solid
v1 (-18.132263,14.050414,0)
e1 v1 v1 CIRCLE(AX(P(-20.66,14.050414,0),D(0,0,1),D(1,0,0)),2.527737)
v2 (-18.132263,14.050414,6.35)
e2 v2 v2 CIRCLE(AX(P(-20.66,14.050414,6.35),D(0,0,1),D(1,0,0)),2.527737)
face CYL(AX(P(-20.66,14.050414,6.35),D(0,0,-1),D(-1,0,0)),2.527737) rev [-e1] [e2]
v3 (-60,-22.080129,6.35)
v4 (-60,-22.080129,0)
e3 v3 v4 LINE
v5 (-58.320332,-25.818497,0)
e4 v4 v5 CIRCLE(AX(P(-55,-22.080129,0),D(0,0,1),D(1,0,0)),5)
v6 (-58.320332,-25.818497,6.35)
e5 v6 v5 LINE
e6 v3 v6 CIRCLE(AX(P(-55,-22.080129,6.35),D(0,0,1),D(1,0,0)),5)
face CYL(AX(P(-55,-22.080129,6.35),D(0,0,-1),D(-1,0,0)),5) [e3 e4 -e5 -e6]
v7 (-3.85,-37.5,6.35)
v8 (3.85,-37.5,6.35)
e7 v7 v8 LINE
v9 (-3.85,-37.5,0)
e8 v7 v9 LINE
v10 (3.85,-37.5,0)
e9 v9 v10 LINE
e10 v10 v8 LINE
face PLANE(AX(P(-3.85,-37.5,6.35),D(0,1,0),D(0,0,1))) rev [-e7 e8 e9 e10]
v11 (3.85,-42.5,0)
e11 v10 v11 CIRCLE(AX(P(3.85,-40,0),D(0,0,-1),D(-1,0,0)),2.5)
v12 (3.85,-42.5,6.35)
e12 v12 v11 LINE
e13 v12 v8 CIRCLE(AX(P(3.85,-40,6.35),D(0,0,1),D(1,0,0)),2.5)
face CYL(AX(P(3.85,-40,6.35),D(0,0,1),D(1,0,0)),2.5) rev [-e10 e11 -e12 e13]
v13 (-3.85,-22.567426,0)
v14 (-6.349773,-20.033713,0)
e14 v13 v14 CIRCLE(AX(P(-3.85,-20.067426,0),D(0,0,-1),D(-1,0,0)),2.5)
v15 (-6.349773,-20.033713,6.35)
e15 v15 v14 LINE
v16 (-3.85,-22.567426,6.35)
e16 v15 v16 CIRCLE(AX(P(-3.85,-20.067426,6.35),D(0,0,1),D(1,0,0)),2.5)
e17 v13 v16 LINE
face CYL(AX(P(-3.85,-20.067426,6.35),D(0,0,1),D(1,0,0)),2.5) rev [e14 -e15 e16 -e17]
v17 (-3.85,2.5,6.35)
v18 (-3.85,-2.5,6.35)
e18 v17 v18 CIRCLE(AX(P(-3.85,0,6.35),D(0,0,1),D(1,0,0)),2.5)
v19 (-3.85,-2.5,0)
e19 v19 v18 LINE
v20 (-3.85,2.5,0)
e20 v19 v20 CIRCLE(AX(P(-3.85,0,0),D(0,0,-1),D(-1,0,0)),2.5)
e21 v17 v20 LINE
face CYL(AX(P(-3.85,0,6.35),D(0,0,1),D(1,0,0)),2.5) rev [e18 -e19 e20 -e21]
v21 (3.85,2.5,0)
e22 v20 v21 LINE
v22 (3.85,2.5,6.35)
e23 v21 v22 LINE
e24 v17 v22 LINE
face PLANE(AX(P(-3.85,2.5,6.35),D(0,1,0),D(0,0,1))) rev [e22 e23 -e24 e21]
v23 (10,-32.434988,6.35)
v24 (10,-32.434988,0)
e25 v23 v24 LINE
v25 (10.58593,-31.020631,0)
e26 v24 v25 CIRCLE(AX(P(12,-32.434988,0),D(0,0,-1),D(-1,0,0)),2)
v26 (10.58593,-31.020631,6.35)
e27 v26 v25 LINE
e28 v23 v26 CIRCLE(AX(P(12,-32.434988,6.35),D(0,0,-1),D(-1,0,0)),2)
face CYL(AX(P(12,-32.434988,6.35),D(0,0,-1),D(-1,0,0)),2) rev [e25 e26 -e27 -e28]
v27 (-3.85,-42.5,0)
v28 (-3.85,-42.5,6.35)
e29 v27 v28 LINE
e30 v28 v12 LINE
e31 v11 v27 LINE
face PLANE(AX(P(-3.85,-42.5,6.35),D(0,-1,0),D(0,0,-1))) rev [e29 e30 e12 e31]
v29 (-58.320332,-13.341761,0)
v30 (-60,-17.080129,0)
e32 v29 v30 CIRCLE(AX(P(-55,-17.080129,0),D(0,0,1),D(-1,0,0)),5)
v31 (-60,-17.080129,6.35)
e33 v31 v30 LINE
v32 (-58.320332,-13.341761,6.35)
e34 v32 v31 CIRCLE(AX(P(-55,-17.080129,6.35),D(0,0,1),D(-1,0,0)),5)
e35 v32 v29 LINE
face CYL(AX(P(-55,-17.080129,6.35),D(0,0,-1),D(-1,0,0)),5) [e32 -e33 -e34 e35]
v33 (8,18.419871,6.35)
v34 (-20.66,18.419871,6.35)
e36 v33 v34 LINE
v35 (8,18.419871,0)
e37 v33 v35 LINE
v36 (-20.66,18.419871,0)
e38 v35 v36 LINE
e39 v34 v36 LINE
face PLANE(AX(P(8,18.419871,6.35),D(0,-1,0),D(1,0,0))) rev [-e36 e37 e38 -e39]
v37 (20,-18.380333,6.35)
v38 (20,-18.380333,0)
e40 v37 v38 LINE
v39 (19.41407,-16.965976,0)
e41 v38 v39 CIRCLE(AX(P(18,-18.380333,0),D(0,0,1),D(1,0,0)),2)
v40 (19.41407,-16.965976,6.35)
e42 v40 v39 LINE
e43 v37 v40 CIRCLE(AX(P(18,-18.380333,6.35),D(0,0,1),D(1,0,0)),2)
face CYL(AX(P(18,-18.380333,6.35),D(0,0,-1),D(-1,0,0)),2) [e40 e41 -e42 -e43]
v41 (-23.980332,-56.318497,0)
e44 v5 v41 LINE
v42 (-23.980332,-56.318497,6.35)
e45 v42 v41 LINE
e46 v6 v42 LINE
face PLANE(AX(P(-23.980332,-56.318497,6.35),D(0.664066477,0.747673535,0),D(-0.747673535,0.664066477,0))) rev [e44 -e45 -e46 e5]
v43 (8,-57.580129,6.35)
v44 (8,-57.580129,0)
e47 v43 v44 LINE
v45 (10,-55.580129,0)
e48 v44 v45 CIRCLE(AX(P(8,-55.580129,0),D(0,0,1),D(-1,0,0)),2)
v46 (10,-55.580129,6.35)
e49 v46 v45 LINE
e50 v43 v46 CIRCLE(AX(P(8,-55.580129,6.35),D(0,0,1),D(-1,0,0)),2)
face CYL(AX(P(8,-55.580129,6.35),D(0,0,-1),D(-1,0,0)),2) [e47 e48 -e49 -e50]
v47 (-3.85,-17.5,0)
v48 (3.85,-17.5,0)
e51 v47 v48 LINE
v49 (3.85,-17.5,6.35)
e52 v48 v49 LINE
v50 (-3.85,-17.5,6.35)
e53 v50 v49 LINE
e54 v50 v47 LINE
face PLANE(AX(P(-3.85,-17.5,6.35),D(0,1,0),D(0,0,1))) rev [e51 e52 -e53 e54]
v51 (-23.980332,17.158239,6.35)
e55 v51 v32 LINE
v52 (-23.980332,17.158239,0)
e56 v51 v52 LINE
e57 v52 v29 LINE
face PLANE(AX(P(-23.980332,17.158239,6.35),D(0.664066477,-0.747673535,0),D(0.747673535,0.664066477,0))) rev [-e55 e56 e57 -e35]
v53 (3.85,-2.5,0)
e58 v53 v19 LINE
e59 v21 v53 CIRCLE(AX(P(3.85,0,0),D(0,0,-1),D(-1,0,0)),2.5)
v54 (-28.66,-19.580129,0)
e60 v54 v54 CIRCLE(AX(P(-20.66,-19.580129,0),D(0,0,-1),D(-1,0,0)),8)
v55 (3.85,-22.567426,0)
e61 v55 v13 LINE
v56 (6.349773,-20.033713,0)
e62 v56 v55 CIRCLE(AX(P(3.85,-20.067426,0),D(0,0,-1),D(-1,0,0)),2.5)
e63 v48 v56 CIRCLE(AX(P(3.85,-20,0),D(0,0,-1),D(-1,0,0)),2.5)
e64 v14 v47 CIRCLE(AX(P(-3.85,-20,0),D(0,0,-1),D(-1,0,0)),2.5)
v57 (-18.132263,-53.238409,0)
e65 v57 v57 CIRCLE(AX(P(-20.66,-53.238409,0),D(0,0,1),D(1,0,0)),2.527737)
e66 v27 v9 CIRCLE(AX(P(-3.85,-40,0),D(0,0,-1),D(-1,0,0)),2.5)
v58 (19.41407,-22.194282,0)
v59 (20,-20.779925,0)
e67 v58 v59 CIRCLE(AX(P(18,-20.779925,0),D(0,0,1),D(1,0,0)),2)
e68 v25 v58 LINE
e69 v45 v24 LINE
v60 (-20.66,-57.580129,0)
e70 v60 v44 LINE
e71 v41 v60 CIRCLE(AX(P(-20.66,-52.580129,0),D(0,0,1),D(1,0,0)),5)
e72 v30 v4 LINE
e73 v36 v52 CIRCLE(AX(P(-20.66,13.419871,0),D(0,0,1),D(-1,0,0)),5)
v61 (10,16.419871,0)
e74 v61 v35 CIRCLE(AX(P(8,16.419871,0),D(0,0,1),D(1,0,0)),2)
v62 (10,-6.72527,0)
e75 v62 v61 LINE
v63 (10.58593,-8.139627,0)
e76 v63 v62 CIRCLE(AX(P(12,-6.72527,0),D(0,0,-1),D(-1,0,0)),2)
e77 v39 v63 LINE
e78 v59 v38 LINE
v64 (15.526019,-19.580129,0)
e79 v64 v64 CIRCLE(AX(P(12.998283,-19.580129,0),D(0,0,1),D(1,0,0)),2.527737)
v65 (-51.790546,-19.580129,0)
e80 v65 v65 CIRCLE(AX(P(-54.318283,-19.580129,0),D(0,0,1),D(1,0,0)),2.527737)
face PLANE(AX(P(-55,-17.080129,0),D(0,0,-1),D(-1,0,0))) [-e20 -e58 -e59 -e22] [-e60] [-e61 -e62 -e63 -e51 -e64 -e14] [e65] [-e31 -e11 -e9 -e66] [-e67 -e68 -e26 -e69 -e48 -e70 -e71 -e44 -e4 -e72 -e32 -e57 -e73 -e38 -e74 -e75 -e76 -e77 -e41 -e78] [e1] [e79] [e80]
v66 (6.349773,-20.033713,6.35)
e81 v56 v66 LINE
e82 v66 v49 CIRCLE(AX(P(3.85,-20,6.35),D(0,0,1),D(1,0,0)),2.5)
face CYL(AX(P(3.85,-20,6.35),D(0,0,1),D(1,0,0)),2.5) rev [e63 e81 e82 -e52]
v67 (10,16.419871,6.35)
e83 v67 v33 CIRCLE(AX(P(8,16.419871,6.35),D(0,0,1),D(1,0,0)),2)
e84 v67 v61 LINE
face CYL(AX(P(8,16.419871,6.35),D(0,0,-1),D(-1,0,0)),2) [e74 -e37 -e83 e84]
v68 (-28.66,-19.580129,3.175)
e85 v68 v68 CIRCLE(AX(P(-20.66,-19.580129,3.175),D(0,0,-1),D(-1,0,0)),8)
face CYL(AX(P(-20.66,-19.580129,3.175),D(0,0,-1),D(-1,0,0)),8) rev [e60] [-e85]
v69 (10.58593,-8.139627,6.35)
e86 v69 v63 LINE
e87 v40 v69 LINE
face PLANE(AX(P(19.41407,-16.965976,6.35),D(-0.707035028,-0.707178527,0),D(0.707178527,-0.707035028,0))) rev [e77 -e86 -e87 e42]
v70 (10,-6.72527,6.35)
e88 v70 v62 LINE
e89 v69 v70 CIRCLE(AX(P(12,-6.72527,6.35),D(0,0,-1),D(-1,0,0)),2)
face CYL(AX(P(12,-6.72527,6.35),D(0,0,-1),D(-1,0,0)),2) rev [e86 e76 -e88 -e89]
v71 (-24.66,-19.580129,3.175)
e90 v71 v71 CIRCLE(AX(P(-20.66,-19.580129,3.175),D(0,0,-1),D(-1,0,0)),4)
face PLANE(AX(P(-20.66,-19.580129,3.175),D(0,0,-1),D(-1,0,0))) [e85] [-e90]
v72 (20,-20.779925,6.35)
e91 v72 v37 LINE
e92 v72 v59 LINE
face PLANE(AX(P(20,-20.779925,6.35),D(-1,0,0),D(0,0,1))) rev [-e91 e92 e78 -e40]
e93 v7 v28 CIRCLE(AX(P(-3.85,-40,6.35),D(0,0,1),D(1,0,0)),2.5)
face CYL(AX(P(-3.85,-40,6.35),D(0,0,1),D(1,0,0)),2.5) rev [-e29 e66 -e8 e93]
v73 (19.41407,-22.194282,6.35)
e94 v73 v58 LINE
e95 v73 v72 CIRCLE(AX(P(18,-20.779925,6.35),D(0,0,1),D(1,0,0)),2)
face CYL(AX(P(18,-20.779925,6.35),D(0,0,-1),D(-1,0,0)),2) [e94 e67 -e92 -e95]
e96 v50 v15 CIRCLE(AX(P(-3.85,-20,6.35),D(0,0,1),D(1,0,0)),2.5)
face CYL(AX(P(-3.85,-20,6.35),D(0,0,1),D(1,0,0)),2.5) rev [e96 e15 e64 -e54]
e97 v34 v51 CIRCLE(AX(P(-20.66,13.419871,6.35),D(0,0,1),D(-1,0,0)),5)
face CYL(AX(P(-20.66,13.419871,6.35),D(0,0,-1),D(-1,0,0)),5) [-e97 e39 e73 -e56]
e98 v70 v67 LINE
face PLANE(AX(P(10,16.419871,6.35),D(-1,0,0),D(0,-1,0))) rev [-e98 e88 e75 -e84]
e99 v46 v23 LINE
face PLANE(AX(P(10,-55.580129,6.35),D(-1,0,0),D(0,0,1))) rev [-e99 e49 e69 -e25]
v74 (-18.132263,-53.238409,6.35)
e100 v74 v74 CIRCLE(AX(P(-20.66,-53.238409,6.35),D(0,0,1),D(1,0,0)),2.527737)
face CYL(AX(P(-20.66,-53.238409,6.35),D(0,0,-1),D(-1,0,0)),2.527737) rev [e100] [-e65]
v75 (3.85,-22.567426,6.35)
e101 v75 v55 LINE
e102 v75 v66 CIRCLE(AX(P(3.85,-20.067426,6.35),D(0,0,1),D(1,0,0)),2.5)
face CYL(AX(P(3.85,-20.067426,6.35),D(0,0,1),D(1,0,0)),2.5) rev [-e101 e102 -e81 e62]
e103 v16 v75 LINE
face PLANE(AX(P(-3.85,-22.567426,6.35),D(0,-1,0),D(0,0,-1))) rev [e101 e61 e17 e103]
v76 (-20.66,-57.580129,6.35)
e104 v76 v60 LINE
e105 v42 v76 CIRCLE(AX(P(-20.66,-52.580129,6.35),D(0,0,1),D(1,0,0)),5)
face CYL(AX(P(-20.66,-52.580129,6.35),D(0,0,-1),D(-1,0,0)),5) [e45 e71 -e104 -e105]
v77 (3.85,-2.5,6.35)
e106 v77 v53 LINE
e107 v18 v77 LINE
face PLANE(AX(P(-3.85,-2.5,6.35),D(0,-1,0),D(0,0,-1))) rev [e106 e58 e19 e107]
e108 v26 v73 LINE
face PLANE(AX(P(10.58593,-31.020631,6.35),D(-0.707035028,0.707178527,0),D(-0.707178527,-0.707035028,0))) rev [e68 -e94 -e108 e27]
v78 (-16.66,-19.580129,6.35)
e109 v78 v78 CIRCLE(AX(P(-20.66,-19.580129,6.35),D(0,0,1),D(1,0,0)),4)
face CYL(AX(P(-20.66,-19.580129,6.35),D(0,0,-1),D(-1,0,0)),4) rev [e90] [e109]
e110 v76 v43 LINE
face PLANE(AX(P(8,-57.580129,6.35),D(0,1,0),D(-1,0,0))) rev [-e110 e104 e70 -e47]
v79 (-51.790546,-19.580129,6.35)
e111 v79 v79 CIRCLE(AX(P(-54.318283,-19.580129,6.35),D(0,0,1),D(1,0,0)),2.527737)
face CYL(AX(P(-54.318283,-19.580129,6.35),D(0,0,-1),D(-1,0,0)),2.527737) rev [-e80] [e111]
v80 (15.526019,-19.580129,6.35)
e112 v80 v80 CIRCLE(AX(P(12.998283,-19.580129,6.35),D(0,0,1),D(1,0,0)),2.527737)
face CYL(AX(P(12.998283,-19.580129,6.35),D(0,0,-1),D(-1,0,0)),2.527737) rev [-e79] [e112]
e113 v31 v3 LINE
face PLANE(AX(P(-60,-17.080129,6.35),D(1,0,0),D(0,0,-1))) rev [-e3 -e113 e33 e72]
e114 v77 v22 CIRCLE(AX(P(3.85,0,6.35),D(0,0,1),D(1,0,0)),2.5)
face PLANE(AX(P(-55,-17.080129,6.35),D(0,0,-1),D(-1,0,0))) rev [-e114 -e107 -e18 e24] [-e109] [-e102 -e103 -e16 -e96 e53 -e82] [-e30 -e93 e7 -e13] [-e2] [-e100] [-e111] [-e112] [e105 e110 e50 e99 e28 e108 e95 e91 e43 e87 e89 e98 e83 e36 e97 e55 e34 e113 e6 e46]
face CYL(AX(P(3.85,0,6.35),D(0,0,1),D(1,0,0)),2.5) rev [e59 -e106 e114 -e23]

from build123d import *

# Parameters (mm, degrees)
SKETCH1_R                 = 4
SKETCH1_R_2               = 2.527736539
BOSS_EXTRUDE1_DEPTH       = 6.35
F_5_0MM_DOWEL_SLOT1_DEPTH = 6.35
SKETCH4_R                 = 8
CUT_EXTRUDE1_DEPTH        = 3.175


# Read off the part's stored shape, not the designer's step: Ø5.0mm Dowel Slot1
with BuildPart() as part:
    # Sketch1 → Boss-Extrude1 (new body)
    with BuildSketch(Plane.XY):
        with BuildLine():
            Line((8, -57.58012907), (-20.66, -57.58012907))
            ThreePointArc((-20.66, -57.58012907), (-22.435973202, -57.254090899), (-23.980332383, -56.318496743))
            Line((-23.980332383, -56.318496743), (-58.320332383, -25.818496743))
            ThreePointArc((-58.320332383, -25.818496743), (-59.560792799, -24.12931648), (-60, -22.08012907))
            Line((-60, -22.08012907), (-60, -17.08012907))
            ThreePointArc((-60, -17.08012907), (-59.560792799, -15.03094166), (-58.320332383, -13.341761396))
            Line((-58.320332383, -13.341761396), (-23.980332383, 17.158238604))
            ThreePointArc((-23.980332383, 17.158238604), (-22.435973202, 18.09383276), (-20.66, 18.41987093))
            Line((-20.66, 18.41987093), (8, 18.41987093))
            ThreePointArc((8, 18.41987093), (9.414213562, 17.834084493), (10, 16.41987093))
            Line((10, 16.41987093), (10, -6.725270109))
            ThreePointArc((10, -6.725270109), (10.152279768, -7.490730718), (10.585929943, -8.139627163))
            Line((10.585929943, -8.139627163), (19.414070057, -16.965975896))
            ThreePointArc((19.414070057, -16.965975896), (19.847720232, -17.614872341), (20, -18.38033295))
            Line((20, -18.38033295), (20, -20.77992519))
            ThreePointArc((20, -20.77992519), (19.847720232, -21.545385798), (19.414070057, -22.194282243))
            Line((19.414070057, -22.194282243), (10.585929943, -31.020630977))
            ThreePointArc((10.585929943, -31.020630977), (10.152279768, -31.669527422), (10, -32.43498803))
            Line((10, -32.43498803), (10, -55.58012907))
            ThreePointArc((10, -55.58012907), (9.414213562, -56.994342632), (8, -57.58012907))
        make_face()
        with Locations((-20.66, -19.58012907)):
            Circle(SKETCH1_R, mode=Mode.SUBTRACT)
        with Locations((-54.318282784, -19.58012907)):
            Circle(SKETCH1_R_2, mode=Mode.SUBTRACT)
        with Locations((-20.66, 14.050414337)):
            Circle(SKETCH1_R_2, mode=Mode.SUBTRACT)
        with Locations((12.998282784, -19.58012907)):
            Circle(SKETCH1_R_2, mode=Mode.SUBTRACT)
        with Locations((-20.66, -53.238409212)):
            Circle(SKETCH1_R_2, mode=Mode.SUBTRACT)
    extrude(amount=BOSS_EXTRUDE1_DEPTH)

    # Ø5.0mm Dowel Slot1 outline → Ø5.0mm Dowel Slot1 (cut)
    with BuildSketch(Plane.XY):
        with BuildLine():
            ThreePointArc((3.85, -22.567426083), (5.629646398, -21.823233219), (6.349772676, -20.033713042))
            ThreePointArc((6.349772676, -20.033713042), (5.629646398, -18.244192864), (3.85, -17.5))
            Line((3.85, -17.5), (-3.85, -17.5))
            ThreePointArc((-3.85, -17.5), (-5.629646398, -18.244192864), (-6.349772676, -20.033713042))
            ThreePointArc((-6.349772676, -20.033713042), (-5.629646398, -21.823233219), (-3.85, -22.567426083))
            Line((-3.85, -22.567426083), (3.85, -22.567426083))
        make_face()
        with BuildLine():
            Line((-3.85, -2.5), (3.85, -2.5))
            ThreePointArc((3.85, -2.5), (6.35, 0), (3.85, 2.5))
            Line((3.85, 2.5), (-3.85, 2.5))
            ThreePointArc((-3.85, 2.5), (-6.35, 0), (-3.85, -2.5))
        make_face()
        with BuildLine():
            Line((-3.85, -42.5), (3.85, -42.5))
            ThreePointArc((3.85, -42.5), (6.35, -40), (3.85, -37.5))
            Line((3.85, -37.5), (-3.85, -37.5))
            ThreePointArc((-3.85, -37.5), (-6.35, -40), (-3.85, -42.5))
        make_face()
    extrude(amount=F_5_0MM_DOWEL_SLOT1_DEPTH, mode=Mode.SUBTRACT)

    # Sketch4 → Cut-Extrude1 (cut)
    with BuildSketch(Plane(origin=(0, 0, 0), x_dir=(-1, 0, 0), z_dir=(0, 0, -1))):
        with Locations((20.66, -19.58012907)):
            Circle(SKETCH4_R)
    extrude(amount=-CUT_EXTRUDE1_DEPTH, mode=Mode.SUBTRACT)


solid = part.part
